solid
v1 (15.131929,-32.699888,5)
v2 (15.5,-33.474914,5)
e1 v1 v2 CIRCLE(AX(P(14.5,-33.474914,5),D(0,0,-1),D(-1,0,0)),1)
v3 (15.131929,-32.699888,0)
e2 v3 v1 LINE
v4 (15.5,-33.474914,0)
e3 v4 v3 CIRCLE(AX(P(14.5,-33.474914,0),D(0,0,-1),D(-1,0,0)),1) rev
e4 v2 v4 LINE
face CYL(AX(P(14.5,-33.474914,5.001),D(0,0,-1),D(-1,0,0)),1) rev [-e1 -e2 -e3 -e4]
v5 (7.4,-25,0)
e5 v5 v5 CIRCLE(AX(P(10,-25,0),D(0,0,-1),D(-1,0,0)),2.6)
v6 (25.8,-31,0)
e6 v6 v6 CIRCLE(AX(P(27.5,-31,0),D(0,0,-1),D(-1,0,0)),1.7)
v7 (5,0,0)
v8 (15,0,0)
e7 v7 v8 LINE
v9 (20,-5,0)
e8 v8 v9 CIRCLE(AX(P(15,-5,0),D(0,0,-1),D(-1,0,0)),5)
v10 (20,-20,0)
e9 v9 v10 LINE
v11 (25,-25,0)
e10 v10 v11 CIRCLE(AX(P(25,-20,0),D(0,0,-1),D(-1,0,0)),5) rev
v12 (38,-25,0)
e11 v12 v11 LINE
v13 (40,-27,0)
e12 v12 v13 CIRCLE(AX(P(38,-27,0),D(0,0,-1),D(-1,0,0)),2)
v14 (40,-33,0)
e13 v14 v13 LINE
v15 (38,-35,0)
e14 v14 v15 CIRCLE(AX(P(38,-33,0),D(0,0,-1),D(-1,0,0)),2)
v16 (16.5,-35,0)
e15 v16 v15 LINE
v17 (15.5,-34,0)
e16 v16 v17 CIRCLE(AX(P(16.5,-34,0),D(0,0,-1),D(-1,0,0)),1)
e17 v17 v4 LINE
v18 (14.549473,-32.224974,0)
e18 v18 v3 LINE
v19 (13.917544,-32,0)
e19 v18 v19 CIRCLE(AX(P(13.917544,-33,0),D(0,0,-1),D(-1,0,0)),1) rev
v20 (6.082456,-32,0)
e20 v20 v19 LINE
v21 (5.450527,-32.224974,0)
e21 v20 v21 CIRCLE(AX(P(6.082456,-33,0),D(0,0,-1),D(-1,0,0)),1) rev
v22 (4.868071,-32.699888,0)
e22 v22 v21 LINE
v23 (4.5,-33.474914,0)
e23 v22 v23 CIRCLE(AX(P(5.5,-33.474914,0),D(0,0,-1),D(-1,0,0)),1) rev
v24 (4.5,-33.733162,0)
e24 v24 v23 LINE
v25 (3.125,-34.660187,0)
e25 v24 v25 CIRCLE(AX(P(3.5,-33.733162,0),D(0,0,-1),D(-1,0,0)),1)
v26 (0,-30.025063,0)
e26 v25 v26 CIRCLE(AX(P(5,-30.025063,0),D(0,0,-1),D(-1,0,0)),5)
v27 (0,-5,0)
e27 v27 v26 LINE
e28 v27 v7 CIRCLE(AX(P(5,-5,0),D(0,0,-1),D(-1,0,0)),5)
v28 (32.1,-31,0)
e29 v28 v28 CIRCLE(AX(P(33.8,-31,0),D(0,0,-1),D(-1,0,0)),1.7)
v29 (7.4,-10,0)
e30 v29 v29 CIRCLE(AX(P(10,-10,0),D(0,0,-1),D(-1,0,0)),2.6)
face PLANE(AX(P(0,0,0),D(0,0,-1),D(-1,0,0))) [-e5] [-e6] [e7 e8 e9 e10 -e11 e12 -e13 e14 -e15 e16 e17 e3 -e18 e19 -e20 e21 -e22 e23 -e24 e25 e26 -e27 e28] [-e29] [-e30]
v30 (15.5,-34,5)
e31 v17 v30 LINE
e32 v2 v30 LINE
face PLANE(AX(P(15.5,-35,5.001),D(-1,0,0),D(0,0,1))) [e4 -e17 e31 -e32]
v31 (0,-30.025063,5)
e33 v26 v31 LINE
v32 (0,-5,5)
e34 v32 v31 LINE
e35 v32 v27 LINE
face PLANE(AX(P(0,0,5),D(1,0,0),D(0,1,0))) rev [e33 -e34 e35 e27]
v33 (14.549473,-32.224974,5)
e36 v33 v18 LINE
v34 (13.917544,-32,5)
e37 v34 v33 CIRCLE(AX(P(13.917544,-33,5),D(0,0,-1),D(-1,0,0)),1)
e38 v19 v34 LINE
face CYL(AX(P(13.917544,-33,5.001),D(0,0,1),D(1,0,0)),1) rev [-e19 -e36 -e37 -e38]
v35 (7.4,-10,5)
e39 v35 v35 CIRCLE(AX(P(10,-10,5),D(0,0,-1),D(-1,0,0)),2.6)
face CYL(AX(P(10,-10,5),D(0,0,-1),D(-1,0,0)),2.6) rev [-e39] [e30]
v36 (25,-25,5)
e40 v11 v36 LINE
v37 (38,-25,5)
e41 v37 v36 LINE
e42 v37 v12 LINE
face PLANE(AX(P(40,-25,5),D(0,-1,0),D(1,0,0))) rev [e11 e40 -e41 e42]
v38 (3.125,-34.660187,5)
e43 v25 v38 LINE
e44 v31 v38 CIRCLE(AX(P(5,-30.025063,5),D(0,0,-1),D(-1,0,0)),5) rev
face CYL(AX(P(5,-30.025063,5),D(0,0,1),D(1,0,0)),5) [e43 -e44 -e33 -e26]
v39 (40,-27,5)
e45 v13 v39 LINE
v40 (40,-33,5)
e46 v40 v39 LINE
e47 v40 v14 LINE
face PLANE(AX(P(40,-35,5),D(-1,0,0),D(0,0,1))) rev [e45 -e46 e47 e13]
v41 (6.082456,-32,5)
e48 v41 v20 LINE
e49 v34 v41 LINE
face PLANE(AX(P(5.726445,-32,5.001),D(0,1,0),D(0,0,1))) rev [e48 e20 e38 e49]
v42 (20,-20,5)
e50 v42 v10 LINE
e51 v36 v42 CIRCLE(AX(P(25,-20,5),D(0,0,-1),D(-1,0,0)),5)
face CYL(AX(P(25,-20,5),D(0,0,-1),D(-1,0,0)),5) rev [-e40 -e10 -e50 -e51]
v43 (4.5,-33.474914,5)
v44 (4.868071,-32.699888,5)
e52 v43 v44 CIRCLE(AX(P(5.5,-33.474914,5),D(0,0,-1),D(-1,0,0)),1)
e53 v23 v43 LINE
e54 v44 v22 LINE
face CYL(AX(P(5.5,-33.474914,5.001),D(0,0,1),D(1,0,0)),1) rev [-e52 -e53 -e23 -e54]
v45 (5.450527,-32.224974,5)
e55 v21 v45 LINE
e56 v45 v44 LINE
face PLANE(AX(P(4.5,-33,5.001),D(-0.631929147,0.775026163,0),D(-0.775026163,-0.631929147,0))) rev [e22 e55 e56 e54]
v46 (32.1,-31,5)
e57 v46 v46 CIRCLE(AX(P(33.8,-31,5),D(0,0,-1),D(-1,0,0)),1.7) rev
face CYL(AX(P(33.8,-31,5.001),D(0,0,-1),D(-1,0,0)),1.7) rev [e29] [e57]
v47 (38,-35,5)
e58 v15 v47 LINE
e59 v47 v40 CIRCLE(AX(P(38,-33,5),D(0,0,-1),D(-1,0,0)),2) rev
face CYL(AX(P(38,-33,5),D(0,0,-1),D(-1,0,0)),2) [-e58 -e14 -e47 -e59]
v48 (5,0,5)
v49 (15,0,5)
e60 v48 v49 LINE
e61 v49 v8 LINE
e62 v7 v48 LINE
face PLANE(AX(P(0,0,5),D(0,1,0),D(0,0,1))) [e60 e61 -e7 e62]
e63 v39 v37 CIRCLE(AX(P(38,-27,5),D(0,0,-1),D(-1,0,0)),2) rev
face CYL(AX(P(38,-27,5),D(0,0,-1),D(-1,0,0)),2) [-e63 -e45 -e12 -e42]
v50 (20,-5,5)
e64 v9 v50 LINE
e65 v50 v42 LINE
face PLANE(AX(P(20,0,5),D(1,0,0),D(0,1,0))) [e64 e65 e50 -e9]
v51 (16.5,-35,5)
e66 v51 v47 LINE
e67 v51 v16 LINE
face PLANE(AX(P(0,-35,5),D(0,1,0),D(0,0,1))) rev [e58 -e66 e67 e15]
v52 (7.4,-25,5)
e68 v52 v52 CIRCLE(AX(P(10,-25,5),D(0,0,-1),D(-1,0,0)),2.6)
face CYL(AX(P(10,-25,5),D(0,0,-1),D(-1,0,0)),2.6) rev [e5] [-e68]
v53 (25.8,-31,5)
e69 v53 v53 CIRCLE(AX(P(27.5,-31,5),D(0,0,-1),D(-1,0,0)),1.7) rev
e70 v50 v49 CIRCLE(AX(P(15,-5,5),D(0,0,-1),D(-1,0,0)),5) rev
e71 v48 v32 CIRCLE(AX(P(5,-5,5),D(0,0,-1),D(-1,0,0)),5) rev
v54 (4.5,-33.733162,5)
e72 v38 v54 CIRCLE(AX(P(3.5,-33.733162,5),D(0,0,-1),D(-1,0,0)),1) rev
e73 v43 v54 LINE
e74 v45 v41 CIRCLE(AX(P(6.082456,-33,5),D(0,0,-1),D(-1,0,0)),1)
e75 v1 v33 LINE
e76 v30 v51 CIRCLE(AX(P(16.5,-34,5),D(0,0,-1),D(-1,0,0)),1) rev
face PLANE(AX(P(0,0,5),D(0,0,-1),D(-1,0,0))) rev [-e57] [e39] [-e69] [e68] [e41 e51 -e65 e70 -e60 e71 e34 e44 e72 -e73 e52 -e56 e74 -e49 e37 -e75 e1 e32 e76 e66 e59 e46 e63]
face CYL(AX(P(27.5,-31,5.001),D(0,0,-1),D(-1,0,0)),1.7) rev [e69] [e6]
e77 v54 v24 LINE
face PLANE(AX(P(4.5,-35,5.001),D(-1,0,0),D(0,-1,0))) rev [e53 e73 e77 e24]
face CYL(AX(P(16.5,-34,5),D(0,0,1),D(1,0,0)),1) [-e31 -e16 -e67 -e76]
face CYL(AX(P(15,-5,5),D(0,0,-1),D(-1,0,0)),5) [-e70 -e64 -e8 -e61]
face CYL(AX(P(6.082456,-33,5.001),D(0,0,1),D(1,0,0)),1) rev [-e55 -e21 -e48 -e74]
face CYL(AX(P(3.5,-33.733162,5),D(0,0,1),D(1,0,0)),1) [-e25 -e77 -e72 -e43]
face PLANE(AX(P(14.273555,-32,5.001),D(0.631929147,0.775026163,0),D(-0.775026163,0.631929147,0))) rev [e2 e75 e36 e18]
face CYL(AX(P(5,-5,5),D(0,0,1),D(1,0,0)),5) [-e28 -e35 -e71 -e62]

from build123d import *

# Parameters (mm, degrees)
BOSS_EXTRUDE1_DEPTH = 5
SKETCH5_R           = 2.6
CUT_EXTRUDE1_DEPTH  = 5
CUT_EXTRUDE2_REACH  = 55.385
SKETCH6_R           = 1.7
CUT_EXTRUDE4_REACH  = 55.385
FILLET4_R           = 1
FILLET1_R           = 5
FILLET2_R           = 2
FILLET5_R           = 1


with BuildPart() as part:
    # Sketch3 → Boss-Extrude1 (new body)
    with BuildSketch(Plane.XY):
        Polygon((20, -35), (40, -35), (40, -25), (20, -25), (20, 0), (0, 0), (0, -35), align=None)
    extrude(amount=BOSS_EXTRUDE1_DEPTH)

    # Sketch5 → Cut-Extrude1 (cut)
    with BuildSketch(Plane(origin=(0, 0, 0), x_dir=(-1, 0, 0), z_dir=(0, 0, -1))):
        with BuildLine():
            ThreePointArc((-7.4, -10), (-8.161522369, -8.161522369), (-10, -7.4))
            Line((-10, -7.4), (-10, -12.6))
            ThreePointArc((-10, -12.6), (-8.161522369, -11.838477631), (-7.4, -10))
        make_face()
        with BuildLine():
            Line((-10, -12.6), (-10, -7.4))
            ThreePointArc((-10, -7.4), (-12.6, -10), (-10, -12.6))
        make_face()
        with Locations((-10, -25)):
            Circle(SKETCH5_R)
    extrude(amount=-CUT_EXTRUDE1_DEPTH, mode=Mode.SUBTRACT)

    # Sketch6 → Cut-Extrude2 (cut, up to next)
    with BuildSketch(Plane(origin=(0, 0, 0), x_dir=(-1, 0, 0), z_dir=(0, 0, -1)), mode=Mode.PRIVATE) as cut_extrude2_sk1:
        with Locations((-27.5, -31)):
            Circle(SKETCH6_R)
    cut_extrude2_tool1 = extrude(cut_extrude2_sk1.sketch, amount=-CUT_EXTRUDE2_REACH, mode=Mode.PRIVATE) & part.part
    # Sketch6 → Cut-Extrude2 (cut, up to next)
    with BuildSketch(Plane(origin=(0, 0, 0), x_dir=(-1, 0, 0), z_dir=(0, 0, -1)), mode=Mode.PRIVATE) as cut_extrude2_sk2:
        with Locations((-33.8, -31)):
            Circle(SKETCH6_R)
    cut_extrude2_tool2 = extrude(cut_extrude2_sk2.sketch, amount=-CUT_EXTRUDE2_REACH, mode=Mode.PRIVATE) & part.part
    add(cut_extrude2_tool1.solids().sort_by_distance((27.5, -31, 0))[0], mode=Mode.SUBTRACT)
    add(cut_extrude2_tool2.solids().sort_by_distance((33.8, -31, 0))[0], mode=Mode.SUBTRACT)

    # Sketch8 → Cut-Extrude4 (cut, up to next)
    with BuildSketch(Plane(origin=(0, 0, 0), x_dir=(-1, 0, 0), z_dir=(0, 0, -1)), mode=Mode.PRIVATE) as cut_extrude4_sk1:
        Polygon((-4.5, -35), (-4.5, -33), (-5.726444717, -32), (-14.273555283, -32), (-15.5, -33), (-15.5, -35), align=None)
    cut_extrude4_tool1 = extrude(cut_extrude4_sk1.sketch, amount=-CUT_EXTRUDE4_REACH, mode=Mode.PRIVATE) & part.part
    add(cut_extrude4_tool1.solids().sort_by_distance((10, -33.545033, 0))[0], mode=Mode.SUBTRACT)

    # Fillet4
    fillet4_edges = [part.edges().sort_by_distance(p)[0] for p in [
        (5.726444717, -32, 2.5),
        (4.5, -33, 2.5),
        (15.5, -35, 2.5),
        (15.5, -33, 2.5),
        (14.273555283, -32, 2.5),
    ]]
    fillet(fillet4_edges, radius=FILLET4_R)

    # Fillet1
    # the kernel refuses this fillet: 5 mm, written as the material it adds along each edge
    with BuildSketch(Plane(origin=(20, -25, 0), x_dir=(1, 0, 0), z_dir=(0, 0, 1))) as fillet1_piece_1:
        with BuildLine():
            CenterArc((FILLET1_R, FILLET1_R), FILLET1_R, 180, 90)
            Line((0, FILLET1_R), (0, 0))
            Line((0, 0), (FILLET1_R, 0))
        make_face()
    extrude(amount=5)
    # the kernel refuses this fillet: 5 mm, written as the material it takes off along each edge
    with BuildSketch(Plane(origin=(0, -35, -12.437342964), x_dir=(0, 1, 0), z_dir=(0, 0, 1))) as fillet1_2_piece_1:
        with BuildLine():
            CenterArc((4.974937186, -5), FILLET1_R, 90, 84.260829523)
            Line((0, -4.5), (0, 0))
            Line((0, 0), (4.974937186, 0))
        make_face()
    extrude(amount=29.874685928, mode=Mode.SUBTRACT)
    with BuildSketch(Plane(origin=(0, 0, -12.5), x_dir=(1, 0, 0), z_dir=(0, 0, 1)), Plane(origin=(20, 0, -12.5), x_dir=(0, -1, 0), z_dir=(0, 0, 1))) as fillet1_2_piece_2:
        with BuildLine():
            CenterArc((FILLET1_R, -FILLET1_R), FILLET1_R, 90, 90)
            Line((0, -FILLET1_R), (0, 0))
            Line((0, 0), (FILLET1_R, 0))
        make_face()
    extrude(amount=30, mode=Mode.SUBTRACT)

    # Fillet2
    fillet2_edges = [part.edges().sort_by_distance(p)[0] for p in [
        (40, -35, 2.5),
        (40, -25, 2.5),
    ]]
    fillet(fillet2_edges, radius=FILLET2_R)

    # Fillet5
    fillet5_edges = [part.edges().sort_by_distance(p)[0] for p in [
        (4.5, -35, 2.5),
    ]]
    fillet(fillet5_edges, radius=FILLET5_R)


solid = part.part
